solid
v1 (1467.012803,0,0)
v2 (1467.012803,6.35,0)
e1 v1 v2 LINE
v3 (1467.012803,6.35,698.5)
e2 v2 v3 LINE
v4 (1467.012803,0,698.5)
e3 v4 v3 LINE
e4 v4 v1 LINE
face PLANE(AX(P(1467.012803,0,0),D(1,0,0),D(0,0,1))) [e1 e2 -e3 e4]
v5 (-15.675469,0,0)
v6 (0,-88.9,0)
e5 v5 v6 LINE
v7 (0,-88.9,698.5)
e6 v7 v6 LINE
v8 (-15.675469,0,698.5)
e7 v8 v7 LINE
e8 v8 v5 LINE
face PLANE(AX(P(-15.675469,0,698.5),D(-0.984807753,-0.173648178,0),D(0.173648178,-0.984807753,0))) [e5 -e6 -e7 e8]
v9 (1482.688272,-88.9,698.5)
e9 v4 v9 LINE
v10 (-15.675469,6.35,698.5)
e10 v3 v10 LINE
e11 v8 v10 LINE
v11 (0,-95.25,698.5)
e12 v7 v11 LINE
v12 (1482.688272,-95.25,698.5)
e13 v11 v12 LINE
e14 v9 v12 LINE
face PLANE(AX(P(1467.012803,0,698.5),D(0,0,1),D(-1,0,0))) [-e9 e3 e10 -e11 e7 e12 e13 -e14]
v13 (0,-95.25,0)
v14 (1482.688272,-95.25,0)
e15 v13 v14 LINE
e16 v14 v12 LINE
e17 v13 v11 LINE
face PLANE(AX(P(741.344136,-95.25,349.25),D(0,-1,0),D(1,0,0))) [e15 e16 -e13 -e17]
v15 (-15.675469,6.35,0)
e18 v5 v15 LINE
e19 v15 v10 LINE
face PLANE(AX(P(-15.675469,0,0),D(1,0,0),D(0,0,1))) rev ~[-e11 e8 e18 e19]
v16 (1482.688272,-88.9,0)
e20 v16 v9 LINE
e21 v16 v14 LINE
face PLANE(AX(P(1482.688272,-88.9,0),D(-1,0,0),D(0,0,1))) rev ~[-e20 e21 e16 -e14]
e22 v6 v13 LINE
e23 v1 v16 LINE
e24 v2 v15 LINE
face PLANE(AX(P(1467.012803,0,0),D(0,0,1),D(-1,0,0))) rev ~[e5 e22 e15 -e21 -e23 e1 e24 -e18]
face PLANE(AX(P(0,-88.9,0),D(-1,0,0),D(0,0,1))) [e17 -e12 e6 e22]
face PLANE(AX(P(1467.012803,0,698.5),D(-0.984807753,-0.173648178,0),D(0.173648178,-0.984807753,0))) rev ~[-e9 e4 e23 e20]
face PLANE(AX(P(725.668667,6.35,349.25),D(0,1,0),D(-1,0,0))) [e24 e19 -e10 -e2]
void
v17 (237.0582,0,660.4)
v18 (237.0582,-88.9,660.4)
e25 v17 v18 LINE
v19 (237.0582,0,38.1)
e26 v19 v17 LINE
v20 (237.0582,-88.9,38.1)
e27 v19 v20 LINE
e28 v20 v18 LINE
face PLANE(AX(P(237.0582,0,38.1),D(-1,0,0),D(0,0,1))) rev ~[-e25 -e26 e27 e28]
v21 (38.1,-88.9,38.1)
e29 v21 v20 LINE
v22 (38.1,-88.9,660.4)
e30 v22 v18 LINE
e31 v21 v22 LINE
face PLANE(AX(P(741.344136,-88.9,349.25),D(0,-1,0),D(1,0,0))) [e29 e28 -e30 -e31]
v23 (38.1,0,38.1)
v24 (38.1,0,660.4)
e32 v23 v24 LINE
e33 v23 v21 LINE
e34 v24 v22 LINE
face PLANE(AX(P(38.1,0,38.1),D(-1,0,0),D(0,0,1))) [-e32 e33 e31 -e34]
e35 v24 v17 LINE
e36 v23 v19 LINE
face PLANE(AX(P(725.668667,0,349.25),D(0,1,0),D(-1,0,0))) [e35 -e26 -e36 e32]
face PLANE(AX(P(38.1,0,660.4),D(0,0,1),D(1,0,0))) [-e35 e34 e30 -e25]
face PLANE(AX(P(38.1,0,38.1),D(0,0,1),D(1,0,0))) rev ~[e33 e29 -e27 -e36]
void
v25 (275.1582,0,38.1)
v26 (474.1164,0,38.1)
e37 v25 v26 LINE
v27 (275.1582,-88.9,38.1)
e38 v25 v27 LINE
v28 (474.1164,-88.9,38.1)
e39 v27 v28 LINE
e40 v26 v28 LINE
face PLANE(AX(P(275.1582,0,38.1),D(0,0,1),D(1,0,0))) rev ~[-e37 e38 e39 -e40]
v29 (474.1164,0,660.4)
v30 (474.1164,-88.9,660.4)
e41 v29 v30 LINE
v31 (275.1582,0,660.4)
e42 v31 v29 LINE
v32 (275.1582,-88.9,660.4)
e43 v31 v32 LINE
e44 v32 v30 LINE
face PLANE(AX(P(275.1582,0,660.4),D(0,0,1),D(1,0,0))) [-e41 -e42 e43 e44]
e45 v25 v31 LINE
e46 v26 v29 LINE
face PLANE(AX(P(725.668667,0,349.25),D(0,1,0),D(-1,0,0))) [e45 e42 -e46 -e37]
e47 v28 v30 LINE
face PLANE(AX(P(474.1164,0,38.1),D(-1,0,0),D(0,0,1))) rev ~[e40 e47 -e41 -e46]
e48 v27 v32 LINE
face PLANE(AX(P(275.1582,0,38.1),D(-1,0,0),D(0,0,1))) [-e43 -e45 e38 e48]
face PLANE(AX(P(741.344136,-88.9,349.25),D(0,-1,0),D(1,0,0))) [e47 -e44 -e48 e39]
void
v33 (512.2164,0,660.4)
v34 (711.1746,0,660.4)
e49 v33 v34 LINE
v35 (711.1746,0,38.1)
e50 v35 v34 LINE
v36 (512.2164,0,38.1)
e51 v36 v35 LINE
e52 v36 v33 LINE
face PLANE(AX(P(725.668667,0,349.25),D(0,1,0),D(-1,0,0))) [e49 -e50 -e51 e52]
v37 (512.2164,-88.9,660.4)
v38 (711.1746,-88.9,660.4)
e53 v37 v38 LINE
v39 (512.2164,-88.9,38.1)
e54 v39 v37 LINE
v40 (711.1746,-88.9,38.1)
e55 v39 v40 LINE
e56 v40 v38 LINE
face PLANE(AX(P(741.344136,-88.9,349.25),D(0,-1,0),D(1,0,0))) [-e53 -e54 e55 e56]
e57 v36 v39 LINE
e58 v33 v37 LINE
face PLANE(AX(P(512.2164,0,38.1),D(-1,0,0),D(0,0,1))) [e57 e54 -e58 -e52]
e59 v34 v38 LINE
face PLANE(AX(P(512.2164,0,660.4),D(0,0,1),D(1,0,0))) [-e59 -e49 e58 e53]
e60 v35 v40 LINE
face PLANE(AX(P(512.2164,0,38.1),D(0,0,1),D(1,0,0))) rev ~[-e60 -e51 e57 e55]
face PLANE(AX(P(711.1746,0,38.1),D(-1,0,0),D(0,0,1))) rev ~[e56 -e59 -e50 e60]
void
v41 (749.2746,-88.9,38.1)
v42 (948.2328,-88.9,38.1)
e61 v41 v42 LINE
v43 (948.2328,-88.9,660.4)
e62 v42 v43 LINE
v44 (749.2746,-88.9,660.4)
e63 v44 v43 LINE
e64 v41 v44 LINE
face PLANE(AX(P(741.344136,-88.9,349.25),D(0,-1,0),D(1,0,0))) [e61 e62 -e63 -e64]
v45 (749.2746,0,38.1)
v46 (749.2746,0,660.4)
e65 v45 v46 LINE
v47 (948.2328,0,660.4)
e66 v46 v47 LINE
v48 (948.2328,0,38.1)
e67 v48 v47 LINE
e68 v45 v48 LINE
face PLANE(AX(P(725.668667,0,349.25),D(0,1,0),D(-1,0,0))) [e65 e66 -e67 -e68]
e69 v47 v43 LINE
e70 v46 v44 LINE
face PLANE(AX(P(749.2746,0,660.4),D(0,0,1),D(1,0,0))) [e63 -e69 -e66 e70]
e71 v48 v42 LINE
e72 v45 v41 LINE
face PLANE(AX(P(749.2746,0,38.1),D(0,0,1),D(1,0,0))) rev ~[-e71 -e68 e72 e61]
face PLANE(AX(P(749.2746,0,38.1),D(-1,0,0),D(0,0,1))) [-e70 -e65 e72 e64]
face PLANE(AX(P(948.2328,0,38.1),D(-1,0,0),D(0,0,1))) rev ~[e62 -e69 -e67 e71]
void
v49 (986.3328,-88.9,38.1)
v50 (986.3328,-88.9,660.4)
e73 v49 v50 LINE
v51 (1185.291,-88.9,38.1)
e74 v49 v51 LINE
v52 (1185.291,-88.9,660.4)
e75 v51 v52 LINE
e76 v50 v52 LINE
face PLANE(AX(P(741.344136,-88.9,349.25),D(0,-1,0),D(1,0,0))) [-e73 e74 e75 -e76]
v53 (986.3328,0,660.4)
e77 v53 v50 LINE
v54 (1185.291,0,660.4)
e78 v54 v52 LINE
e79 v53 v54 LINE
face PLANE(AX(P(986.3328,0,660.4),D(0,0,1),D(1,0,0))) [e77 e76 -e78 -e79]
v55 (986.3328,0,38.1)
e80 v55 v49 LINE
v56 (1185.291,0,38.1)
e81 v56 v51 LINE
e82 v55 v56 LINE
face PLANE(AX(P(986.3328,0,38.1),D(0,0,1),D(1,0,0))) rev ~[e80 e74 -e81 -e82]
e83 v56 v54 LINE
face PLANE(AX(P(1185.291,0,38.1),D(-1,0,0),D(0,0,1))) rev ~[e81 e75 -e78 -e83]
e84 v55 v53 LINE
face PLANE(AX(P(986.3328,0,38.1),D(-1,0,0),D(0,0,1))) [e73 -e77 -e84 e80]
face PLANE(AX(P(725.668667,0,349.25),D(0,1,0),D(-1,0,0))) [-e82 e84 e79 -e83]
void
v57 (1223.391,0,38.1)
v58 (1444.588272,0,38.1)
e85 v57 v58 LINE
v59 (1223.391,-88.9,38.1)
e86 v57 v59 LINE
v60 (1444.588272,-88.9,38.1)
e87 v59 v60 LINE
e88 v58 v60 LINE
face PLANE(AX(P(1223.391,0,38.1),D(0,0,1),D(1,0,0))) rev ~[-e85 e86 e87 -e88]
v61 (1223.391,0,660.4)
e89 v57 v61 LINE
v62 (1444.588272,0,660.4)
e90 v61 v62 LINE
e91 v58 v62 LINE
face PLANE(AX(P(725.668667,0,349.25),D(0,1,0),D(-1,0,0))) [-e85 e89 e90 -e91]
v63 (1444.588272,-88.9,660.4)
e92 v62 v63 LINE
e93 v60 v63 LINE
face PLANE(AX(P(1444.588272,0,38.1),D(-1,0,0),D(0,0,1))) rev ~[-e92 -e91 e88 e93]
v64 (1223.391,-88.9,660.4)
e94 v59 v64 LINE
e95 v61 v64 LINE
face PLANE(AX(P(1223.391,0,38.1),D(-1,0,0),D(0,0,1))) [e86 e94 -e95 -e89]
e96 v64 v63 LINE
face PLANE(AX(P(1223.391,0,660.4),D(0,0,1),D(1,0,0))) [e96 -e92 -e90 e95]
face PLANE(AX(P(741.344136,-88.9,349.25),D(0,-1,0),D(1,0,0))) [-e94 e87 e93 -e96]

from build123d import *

# Parameters (mm, degrees)
F0_W     = 198.9582
F0_H     = 622.3
F0_W_2   = 221.1972716
F1_DEPTH = 88.9
F3_DEPTH = 698.5
F5_DEPTH = 698.501
F6_W     = 1482.6882716
F6_H     = 698.5
F7_DEPTH = 6.35
F8_W     = 1482.6882716
F8_H     = 698.5
F9_DEPTH = 6.35


# Not quite as in the source:
# - a feature names something its author has since deleted; it is built from what else it names


with BuildPart() as f1:
    # F0 (on Front) → F1 (new body)
    with BuildSketch(Plane.XZ):
        Polygon((0, 38.1), (0, 0), (1482.6882716, 0), (1482.6882716, 38.1), (1482.6882716, 660.4), (1482.6882716, 698.5), (0, 698.5), (0, 660.4), align=None)
        with Locations((137.5791, 349.25)):
            Rectangle(F0_W, F0_H, mode=Mode.SUBTRACT)
        with Locations((374.6373, 349.25)):
            Rectangle(F0_W, F0_H, mode=Mode.SUBTRACT)
        with Locations((611.6955, 349.25)):
            Rectangle(F0_W, F0_H, mode=Mode.SUBTRACT)
        with Locations((848.7537, 349.25)):
            Rectangle(F0_W, F0_H, mode=Mode.SUBTRACT)
        with Locations((1085.8119, 349.25)):
            Rectangle(F0_W, F0_H, mode=Mode.SUBTRACT)
        with Locations((1333.9896358, 349.25)):
            Rectangle(F0_W_2, F0_H, mode=Mode.SUBTRACT)
    extrude(amount=F1_DEPTH)

    # F2 (on face) → F3 (join, through all)
    with BuildSketch(Plane.XY.offset(698.5)):
        Polygon((-15.675468585, 0), (0, -88.9), (0, 0), align=None)
    extrude(amount=-F3_DEPTH)

    # F4 (on face) → F5 (cut, through all)
    with BuildSketch(Plane.XY.offset(698.5)):
        Polygon((1467.012803015, 0), (1482.6882716, -88.9), (1482.6882716, 0), align=None)
    extrude(amount=-F5_DEPTH, mode=Mode.SUBTRACT)

    # F6 (on face) → F7 (join)
    with BuildSketch(Plane.XZ.offset(88.9)):
        with Locations((741.3441358, 349.25)):
            Rectangle(F6_W, F6_H)
    extrude(amount=F7_DEPTH)

    # F8 (on face) → F9 (join)
    with BuildSketch(Plane(origin=(0, 0, 0), x_dir=(-1, 0, 0), z_dir=(0, 1, 0))):
        with Locations((-725.668667215, 349.25)):
            Rectangle(F8_W, F8_H)
    extrude(amount=F9_DEPTH)


solid = f1.part
